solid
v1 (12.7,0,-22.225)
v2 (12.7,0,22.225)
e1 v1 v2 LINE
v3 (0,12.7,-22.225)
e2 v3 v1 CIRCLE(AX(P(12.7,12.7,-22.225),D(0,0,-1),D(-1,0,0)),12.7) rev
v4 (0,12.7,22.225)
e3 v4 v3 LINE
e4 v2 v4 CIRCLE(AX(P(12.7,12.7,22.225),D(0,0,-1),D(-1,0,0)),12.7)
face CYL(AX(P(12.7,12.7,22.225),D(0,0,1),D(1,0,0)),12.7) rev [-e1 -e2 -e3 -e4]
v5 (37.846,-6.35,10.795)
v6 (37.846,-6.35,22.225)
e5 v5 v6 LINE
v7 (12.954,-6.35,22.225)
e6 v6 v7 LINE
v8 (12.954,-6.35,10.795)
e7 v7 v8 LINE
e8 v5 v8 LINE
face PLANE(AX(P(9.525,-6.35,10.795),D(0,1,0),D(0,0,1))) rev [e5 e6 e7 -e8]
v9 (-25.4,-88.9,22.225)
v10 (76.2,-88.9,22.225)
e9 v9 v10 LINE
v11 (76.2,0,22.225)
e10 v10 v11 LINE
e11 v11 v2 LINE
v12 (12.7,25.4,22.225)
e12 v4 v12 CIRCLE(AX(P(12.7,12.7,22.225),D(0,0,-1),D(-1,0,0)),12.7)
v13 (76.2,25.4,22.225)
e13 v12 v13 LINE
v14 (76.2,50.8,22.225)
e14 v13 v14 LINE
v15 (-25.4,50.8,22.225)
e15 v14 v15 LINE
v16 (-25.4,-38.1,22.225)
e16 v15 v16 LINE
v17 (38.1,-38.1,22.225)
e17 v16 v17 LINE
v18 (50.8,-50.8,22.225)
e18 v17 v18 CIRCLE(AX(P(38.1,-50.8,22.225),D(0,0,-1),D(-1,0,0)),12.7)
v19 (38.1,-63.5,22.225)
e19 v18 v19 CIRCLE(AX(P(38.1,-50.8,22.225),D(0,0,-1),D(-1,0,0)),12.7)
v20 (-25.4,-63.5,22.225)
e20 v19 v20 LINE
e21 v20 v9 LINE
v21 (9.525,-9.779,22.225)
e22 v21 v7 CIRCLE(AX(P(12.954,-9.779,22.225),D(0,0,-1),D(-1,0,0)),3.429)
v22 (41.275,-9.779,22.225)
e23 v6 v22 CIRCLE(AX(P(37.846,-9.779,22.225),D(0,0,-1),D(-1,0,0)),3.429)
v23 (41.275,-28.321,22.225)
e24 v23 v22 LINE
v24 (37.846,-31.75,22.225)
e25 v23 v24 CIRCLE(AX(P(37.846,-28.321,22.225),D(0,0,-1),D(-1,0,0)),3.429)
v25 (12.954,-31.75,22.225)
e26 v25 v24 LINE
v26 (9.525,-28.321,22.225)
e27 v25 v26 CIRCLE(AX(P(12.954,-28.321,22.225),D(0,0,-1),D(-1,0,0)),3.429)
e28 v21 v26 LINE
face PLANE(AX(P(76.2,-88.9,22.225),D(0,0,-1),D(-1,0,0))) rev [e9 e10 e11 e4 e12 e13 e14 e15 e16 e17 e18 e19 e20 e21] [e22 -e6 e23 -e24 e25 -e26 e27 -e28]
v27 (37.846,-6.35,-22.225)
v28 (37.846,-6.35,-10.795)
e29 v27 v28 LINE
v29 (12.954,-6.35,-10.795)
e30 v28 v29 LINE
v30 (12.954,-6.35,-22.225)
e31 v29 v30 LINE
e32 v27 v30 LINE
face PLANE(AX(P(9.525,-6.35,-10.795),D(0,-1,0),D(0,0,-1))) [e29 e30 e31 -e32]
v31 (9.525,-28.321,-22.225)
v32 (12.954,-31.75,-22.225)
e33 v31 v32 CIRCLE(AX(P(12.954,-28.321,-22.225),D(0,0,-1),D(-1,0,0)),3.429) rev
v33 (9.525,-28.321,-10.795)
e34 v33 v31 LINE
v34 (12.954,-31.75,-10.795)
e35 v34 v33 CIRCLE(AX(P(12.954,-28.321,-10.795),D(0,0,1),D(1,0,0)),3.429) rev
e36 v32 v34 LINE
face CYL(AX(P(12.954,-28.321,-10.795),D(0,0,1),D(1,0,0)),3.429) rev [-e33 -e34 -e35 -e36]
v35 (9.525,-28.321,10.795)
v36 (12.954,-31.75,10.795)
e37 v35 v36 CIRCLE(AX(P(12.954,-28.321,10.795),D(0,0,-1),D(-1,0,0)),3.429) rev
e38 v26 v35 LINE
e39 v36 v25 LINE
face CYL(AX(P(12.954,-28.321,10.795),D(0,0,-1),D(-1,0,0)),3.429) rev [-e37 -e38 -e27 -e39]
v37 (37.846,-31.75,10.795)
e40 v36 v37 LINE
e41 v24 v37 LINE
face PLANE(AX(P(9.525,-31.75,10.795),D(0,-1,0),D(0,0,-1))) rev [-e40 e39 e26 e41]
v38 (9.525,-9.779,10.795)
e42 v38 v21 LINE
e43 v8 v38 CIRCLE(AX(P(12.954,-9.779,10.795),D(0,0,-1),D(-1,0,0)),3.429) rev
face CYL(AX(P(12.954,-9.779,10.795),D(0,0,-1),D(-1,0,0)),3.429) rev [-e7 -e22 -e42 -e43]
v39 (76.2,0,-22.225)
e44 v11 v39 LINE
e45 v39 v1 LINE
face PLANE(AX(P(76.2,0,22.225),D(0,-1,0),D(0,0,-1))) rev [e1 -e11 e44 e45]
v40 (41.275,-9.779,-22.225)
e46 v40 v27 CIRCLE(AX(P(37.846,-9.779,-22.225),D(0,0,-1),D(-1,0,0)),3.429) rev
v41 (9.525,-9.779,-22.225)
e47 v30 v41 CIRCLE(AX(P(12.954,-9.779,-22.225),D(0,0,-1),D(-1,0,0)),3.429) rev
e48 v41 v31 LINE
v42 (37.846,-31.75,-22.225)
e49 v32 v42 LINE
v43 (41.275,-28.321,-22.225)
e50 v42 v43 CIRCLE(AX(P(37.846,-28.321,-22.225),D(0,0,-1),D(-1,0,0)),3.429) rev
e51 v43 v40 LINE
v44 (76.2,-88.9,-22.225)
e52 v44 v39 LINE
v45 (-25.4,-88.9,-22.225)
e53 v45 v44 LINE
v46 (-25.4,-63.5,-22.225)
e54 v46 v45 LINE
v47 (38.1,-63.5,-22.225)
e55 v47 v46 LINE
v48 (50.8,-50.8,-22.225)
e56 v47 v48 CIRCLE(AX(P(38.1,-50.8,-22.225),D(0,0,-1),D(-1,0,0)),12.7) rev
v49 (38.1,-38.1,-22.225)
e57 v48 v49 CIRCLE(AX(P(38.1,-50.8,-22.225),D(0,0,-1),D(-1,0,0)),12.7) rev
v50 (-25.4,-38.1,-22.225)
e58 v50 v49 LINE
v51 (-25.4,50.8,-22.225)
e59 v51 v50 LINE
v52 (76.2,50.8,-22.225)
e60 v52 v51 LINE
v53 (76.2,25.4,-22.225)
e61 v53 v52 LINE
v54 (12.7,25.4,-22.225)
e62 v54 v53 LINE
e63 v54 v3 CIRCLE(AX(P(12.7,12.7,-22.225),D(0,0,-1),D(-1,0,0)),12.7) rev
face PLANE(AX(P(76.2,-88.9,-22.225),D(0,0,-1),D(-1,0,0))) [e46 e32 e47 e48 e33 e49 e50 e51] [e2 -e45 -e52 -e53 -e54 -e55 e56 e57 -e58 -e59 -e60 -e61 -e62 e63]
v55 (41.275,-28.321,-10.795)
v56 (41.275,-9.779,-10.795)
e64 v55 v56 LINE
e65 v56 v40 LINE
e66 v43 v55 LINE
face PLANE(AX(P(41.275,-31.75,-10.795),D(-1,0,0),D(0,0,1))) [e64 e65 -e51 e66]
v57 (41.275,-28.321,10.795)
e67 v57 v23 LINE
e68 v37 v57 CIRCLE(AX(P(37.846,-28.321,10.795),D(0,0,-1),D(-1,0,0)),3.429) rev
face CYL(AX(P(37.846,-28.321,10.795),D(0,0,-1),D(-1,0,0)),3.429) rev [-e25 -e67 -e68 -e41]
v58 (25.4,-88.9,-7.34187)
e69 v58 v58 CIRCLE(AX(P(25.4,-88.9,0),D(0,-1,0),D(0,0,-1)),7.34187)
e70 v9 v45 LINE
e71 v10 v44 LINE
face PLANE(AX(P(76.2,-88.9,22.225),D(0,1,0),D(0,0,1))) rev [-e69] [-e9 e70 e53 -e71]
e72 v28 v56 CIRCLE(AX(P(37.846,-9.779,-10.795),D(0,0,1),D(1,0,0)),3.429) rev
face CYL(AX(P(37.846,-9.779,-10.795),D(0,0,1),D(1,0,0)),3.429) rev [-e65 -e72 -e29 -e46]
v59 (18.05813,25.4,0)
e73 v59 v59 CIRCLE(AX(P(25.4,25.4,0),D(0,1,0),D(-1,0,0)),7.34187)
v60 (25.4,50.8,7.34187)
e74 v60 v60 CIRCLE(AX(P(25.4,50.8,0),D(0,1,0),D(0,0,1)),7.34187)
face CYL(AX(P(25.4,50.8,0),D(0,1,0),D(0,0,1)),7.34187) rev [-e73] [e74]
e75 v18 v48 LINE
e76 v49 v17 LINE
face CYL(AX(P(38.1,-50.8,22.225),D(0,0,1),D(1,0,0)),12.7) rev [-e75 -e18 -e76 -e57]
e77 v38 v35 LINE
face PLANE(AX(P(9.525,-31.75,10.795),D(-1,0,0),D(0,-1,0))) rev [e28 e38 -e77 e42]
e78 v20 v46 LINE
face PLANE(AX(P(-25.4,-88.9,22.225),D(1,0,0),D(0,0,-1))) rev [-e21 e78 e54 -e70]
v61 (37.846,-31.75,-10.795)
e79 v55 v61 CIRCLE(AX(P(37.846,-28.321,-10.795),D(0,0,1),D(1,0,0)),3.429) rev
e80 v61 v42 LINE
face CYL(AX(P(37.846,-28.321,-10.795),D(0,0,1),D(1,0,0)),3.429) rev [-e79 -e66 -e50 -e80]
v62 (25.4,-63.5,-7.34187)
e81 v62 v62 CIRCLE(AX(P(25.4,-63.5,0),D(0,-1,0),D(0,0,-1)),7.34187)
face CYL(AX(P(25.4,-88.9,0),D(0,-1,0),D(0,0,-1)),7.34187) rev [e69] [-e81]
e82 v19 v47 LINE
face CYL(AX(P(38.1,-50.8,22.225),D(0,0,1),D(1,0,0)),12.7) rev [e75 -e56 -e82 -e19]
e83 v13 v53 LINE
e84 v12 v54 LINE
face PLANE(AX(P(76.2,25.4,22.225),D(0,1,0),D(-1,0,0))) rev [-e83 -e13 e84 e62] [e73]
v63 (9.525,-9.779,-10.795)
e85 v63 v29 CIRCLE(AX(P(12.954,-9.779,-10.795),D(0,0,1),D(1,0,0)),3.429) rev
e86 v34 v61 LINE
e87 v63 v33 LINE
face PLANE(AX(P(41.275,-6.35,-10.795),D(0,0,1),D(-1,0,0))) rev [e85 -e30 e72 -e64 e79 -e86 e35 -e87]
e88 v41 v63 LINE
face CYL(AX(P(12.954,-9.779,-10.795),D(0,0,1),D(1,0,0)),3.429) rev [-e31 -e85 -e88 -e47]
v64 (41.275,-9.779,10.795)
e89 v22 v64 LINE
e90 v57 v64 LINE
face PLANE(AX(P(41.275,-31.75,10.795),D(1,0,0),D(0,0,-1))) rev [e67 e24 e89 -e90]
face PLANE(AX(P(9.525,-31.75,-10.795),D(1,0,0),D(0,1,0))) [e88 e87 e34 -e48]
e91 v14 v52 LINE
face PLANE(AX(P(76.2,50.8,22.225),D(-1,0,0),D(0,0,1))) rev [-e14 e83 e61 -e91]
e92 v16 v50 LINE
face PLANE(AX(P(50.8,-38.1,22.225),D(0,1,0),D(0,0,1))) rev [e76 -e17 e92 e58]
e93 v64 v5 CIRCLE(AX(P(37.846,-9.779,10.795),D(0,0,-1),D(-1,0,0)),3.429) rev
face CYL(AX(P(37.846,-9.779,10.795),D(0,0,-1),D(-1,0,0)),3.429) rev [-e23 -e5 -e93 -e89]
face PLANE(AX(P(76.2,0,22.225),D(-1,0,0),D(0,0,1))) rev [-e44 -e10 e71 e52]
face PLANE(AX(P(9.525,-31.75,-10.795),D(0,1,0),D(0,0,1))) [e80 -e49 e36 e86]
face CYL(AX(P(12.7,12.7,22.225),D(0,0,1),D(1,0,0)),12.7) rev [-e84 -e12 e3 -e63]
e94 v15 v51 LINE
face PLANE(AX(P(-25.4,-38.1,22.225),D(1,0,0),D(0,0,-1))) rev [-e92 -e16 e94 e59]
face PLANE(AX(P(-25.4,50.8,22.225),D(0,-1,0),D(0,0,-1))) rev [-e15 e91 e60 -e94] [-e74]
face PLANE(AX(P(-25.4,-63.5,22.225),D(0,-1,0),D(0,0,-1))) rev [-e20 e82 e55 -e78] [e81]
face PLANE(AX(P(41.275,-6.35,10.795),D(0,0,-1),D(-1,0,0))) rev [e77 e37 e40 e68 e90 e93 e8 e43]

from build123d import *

# Parameters (mm, degrees)
BOSS_EXTRUDE1_DEPTH         = 22.225
FILLET1_R                   = 12.7
F_5_8_18_TAPPED_HOLE1_D     = 14.68374
F_5_8_18_TAPPED_HOLE1_DEPTH = 25.4
F_5_8_18_TAPPED_HOLE2_D     = 14.68374
F_5_8_18_TAPPED_HOLE2_DEPTH = 25.4
SKETCH8_W                   = 31.75
SKETCH8_H                   = 25.4
CUT_EXTRUDE1_DEPTH          = 11.43
FILLET2_R                   = 3.429
FILLET2_OF_MIRROR1_R        = 3.429


with BuildPart() as part:
    # Sketch1 → Boss-Extrude1 (new, symmetric)
    with BuildSketch(Plane.XY):
        Polygon((76.2, 0), (0, 0), (0, 25.4), (76.2, 25.4), (76.2, 50.8), (-25.4, 50.8), (-25.4, -38.1), (50.8, -38.1), (50.8, -63.5), (-25.4, -63.5), (-25.4, -88.9), (76.2, -88.9), align=None)
    extrude(amount=BOSS_EXTRUDE1_DEPTH, both=True)

    # Fillet1
    fillet1_edges = [part.edges().sort_by_distance(p)[0] for p in [
        (50.8, -63.5, 0),
        (50.8, -38.1, 0),
        (0, 25.4, 0),
        (0, 0, 0),
    ]]
    fillet(fillet1_edges, radius=FILLET1_R - 0.0001)  # a hair under: the kernel refuses the full size

    # 5/8-18 Tapped Hole1
    with Locations(Plane.XZ.offset(88.9)):
        with Locations((25.4, 0)):
            Hole(F_5_8_18_TAPPED_HOLE1_D / 2, depth=F_5_8_18_TAPPED_HOLE1_DEPTH)

    # 5/8-18 Tapped Hole2
    with Locations(Plane(origin=(0, 50.8, 0), x_dir=(-1, 0, 0), z_dir=(0, 1, 0))):
        with Locations((-25.4, 0)):
            Hole(F_5_8_18_TAPPED_HOLE2_D / 2, depth=F_5_8_18_TAPPED_HOLE2_DEPTH)

    # Sketch8 → Cut-Extrude1 (cut)
    with BuildSketch(Plane.XY.offset(22.225)):
        with Locations((25.4, -19.05)):
            Rectangle(SKETCH8_W, SKETCH8_H)
    cut_extrude1 = extrude(amount=-CUT_EXTRUDE1_DEPTH, mode=Mode.SUBTRACT)

    # Fillet2
    fillet2_edges = [part.edges().sort_by_distance(p)[0] for p in [
        (41.275, -6.35, 16.51),
        (41.275, -31.75, 16.51),
        (9.525, -31.75, 16.51),
        (9.525, -6.35, 16.51),
    ]]
    fillet(fillet2_edges, radius=FILLET2_R)

    # Mirror1: Cut-Extrude1 across plane
    add(cut_extrude1.mirror(Plane.XY), mode=Mode.SUBTRACT)

    # Fillet2 of Mirror1
    fillet2_of_mirror1_edges = [part.edges().sort_by_distance(p)[0] for p in [
        (41.275, -6.35, -16.51),
        (41.275, -31.75, -16.51),
        (9.525, -31.75, -16.51),
        (9.525, -6.35, -16.51),
    ]]
    fillet(fillet2_of_mirror1_edges, radius=FILLET2_OF_MIRROR1_R)


solid = part.part
